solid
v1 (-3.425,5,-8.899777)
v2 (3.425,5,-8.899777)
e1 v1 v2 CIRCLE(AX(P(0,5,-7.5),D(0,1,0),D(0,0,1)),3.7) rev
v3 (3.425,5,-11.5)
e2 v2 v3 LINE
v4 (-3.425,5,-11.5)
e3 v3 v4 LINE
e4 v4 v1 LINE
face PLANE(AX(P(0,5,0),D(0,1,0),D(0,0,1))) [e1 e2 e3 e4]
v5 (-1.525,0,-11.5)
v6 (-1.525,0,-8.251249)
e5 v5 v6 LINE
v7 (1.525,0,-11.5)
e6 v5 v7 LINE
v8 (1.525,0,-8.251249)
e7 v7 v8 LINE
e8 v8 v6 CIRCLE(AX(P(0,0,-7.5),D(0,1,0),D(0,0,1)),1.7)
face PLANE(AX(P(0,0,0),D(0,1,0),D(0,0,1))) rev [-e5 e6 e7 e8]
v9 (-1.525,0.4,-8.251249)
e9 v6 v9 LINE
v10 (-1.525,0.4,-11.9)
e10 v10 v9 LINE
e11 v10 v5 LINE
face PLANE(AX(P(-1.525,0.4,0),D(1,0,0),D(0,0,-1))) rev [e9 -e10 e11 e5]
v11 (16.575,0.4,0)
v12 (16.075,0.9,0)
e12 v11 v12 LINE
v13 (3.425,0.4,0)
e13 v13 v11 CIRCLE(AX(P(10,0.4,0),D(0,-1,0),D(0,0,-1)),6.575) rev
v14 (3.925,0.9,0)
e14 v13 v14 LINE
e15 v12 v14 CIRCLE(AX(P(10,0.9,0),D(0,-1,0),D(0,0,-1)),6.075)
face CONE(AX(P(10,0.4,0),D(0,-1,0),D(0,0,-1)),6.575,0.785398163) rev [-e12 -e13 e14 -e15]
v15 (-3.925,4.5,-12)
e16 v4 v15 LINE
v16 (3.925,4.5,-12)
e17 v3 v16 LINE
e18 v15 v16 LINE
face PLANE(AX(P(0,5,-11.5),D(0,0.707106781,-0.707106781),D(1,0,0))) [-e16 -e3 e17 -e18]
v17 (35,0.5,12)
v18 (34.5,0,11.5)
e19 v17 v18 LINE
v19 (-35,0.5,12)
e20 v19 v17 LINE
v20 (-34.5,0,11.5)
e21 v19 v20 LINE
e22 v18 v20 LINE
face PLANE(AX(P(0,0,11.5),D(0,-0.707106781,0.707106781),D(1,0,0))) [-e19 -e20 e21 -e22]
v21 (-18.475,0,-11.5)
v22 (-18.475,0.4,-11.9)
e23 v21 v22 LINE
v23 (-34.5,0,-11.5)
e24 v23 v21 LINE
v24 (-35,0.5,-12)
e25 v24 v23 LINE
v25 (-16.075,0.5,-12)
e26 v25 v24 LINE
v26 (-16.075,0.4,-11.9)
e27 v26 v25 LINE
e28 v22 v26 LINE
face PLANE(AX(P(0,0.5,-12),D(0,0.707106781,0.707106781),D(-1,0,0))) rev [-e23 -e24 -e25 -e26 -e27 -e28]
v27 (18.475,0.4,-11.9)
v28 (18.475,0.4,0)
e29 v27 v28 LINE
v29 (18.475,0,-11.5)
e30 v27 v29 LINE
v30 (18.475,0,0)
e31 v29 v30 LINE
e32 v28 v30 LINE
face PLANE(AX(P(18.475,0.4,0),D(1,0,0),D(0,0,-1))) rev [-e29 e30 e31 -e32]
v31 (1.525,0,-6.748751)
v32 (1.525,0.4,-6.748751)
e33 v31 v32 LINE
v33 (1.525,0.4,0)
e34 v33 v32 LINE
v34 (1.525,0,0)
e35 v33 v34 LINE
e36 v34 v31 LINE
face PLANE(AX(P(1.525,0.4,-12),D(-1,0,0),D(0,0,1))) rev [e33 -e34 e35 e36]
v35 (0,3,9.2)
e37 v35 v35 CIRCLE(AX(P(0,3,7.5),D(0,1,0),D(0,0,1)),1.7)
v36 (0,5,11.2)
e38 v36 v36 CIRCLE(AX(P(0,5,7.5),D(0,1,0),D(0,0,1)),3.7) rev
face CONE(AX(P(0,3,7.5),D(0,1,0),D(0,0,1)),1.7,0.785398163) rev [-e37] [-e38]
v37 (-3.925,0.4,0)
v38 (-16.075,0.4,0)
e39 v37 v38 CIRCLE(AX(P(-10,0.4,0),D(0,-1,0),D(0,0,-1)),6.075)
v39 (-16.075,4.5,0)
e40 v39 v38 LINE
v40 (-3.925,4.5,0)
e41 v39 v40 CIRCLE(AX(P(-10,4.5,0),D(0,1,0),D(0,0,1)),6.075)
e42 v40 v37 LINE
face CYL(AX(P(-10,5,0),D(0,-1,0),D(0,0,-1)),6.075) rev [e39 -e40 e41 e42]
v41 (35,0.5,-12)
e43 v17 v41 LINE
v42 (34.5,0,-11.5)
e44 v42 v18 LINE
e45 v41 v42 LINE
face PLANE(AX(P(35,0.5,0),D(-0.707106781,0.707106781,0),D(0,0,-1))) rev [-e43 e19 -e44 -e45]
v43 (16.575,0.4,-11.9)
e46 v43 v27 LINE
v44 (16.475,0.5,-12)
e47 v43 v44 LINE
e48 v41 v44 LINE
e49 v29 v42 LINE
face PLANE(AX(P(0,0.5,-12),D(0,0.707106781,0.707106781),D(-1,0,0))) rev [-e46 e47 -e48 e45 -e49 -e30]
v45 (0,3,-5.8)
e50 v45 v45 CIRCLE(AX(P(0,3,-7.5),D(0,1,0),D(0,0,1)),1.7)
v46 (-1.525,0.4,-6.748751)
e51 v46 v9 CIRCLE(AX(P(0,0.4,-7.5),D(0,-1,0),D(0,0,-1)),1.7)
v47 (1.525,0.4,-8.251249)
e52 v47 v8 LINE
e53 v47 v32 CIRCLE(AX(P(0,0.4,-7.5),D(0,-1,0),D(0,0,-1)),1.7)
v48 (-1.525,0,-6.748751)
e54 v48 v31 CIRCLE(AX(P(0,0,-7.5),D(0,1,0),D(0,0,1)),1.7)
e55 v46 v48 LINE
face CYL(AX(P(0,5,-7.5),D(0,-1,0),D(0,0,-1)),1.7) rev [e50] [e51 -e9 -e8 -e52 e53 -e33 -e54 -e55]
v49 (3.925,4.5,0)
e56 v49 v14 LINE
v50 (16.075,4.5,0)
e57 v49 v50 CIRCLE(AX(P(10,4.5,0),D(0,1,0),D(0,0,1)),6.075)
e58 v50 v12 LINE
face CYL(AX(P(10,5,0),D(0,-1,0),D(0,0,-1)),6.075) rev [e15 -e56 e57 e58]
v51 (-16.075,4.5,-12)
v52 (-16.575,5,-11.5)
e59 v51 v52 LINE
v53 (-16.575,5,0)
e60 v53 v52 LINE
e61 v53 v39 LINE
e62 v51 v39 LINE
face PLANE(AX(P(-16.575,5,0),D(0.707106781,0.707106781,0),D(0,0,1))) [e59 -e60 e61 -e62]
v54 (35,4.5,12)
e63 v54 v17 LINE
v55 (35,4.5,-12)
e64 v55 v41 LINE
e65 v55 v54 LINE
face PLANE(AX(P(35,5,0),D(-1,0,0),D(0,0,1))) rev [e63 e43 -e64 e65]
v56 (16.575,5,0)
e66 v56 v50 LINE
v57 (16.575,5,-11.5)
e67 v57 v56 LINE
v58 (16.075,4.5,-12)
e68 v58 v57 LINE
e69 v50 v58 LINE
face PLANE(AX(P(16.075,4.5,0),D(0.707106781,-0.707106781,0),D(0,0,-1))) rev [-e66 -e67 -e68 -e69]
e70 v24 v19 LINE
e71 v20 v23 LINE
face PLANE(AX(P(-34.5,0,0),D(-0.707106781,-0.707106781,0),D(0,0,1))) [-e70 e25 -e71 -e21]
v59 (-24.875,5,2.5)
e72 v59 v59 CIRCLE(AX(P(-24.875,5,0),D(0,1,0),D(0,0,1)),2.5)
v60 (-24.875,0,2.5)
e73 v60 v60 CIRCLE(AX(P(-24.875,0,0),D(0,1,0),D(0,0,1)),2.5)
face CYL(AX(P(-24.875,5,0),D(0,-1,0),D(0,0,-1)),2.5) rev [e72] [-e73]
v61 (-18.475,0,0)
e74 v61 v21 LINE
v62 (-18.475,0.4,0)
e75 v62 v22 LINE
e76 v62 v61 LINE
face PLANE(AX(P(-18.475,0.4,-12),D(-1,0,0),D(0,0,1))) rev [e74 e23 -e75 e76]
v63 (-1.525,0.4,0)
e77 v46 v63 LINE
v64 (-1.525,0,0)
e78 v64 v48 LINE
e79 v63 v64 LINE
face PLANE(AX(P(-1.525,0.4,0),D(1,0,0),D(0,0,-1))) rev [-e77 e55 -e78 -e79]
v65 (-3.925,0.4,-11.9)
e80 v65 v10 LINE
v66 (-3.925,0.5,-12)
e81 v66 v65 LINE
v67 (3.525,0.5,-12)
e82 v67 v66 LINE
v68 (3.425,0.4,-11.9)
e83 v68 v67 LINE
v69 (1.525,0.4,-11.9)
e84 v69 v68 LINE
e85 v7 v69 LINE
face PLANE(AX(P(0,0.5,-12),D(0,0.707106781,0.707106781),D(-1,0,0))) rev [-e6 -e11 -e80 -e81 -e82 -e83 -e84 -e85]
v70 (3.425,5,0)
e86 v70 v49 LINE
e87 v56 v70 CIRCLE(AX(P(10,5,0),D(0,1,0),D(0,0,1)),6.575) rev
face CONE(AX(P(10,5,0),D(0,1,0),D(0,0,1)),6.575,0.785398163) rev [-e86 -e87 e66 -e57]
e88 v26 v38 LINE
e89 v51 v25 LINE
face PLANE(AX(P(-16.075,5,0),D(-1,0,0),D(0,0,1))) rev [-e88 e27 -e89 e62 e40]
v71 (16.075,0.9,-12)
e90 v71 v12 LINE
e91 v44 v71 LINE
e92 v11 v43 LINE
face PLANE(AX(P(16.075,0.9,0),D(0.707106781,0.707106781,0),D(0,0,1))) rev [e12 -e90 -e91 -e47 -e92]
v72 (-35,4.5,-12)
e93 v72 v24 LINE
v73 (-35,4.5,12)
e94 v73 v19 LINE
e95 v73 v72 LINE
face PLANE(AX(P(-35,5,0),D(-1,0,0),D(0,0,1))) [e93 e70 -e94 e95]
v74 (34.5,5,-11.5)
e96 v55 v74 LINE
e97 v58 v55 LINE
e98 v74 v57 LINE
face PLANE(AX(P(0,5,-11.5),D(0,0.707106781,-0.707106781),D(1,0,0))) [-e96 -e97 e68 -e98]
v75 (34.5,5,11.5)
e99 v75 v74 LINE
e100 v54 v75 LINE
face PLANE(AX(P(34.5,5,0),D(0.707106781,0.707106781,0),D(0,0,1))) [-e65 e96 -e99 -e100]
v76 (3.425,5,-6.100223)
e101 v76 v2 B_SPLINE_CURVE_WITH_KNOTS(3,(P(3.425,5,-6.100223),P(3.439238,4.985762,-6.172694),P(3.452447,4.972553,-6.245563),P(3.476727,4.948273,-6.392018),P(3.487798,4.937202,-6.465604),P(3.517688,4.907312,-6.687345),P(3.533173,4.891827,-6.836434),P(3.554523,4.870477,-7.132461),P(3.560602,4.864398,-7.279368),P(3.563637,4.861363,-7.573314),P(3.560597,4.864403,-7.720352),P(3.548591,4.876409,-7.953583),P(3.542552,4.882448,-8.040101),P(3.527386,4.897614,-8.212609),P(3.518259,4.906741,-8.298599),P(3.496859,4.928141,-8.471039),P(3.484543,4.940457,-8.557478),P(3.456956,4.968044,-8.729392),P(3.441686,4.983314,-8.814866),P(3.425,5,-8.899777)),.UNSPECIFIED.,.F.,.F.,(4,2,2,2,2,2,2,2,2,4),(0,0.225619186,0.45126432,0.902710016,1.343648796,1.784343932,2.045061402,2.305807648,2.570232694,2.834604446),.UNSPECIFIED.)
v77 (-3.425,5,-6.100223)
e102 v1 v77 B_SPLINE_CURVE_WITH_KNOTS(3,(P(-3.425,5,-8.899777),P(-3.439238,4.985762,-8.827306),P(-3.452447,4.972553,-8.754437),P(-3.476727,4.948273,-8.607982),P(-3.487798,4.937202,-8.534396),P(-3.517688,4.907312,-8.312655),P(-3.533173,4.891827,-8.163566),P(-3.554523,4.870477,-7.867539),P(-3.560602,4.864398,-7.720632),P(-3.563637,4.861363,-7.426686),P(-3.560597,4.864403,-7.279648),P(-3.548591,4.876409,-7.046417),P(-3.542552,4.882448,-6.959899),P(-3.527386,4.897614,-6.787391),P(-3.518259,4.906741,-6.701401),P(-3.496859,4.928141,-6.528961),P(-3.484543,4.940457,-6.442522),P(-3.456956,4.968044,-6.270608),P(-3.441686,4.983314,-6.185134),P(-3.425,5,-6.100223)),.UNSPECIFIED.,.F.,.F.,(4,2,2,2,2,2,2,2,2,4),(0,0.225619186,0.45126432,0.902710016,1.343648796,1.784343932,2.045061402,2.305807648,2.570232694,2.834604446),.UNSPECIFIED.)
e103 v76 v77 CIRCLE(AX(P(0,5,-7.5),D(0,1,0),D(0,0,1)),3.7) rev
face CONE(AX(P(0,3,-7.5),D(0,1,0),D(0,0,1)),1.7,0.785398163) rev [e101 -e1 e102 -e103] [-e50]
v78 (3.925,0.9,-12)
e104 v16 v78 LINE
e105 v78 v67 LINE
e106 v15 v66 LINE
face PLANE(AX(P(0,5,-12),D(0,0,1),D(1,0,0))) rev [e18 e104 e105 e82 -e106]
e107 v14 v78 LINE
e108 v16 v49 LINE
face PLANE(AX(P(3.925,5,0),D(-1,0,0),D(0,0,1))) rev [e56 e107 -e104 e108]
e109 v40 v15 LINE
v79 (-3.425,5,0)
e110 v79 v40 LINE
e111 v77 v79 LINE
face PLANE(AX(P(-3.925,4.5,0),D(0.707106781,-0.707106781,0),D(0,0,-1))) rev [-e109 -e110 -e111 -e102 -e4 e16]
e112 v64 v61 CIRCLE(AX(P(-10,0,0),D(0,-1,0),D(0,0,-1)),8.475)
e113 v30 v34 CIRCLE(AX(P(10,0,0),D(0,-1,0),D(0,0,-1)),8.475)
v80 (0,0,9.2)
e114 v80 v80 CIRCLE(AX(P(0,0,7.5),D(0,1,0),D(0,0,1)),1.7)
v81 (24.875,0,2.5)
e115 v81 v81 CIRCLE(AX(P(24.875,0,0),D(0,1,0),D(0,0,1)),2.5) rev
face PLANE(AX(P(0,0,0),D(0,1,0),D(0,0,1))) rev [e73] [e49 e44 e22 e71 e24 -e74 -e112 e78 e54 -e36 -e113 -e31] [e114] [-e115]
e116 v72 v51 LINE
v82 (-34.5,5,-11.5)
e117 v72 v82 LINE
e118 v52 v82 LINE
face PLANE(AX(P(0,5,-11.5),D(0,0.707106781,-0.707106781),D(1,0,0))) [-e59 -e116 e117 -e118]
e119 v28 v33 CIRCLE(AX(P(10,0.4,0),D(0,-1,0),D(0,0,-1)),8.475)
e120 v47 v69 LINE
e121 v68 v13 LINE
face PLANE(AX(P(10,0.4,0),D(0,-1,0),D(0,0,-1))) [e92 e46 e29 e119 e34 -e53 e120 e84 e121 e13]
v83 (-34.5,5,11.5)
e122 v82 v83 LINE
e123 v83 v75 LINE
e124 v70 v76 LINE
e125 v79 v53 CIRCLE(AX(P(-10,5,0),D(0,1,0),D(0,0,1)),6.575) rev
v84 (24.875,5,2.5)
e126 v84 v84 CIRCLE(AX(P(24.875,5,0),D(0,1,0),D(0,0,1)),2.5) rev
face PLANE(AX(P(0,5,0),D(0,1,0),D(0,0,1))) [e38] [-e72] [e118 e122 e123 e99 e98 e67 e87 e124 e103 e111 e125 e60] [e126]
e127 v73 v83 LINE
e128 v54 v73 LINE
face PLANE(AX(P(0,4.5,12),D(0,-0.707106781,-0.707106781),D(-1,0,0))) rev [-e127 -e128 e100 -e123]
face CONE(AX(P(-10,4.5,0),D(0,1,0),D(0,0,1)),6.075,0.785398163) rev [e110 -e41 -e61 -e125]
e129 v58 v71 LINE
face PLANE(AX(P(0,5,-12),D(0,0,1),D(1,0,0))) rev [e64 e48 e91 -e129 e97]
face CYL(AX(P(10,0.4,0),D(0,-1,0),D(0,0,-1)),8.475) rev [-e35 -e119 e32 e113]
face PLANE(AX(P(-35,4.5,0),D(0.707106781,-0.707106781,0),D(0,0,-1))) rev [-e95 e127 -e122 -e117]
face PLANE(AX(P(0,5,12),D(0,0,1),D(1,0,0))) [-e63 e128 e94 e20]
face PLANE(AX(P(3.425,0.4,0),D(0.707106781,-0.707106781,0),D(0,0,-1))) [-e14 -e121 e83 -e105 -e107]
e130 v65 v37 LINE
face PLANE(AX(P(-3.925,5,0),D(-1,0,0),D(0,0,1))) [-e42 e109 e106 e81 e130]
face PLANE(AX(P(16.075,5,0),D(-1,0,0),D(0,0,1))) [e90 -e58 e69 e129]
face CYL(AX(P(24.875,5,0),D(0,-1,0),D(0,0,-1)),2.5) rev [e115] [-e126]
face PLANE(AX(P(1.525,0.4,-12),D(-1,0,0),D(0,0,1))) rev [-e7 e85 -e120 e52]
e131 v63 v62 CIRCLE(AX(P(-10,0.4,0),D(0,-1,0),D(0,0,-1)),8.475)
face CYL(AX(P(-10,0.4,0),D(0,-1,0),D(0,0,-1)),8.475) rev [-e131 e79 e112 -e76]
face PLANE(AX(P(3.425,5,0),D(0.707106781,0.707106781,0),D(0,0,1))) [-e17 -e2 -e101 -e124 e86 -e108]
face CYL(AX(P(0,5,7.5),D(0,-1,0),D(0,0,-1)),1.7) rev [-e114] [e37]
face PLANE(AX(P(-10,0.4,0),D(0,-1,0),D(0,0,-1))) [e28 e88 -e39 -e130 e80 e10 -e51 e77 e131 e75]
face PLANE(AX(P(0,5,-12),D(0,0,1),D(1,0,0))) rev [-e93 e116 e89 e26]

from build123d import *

# Parameters (mm, degrees)
SKETCH1_R           = 1.7
SKETCH1_R_2         = 2.5
BOSS_EXTRUDE1_DEPTH = 5
CHAMFER2_SIZE       = 2
CUT_EXTRUDE1_DEPTH  = 0.4
CHAMFER1_SIZE       = 0.5


with BuildPart() as part:
    # Sketch1 → Boss-Extrude1 (new body)
    with BuildSketch(Plane(origin=(0, 0, 0), x_dir=(1, 0, 0), z_dir=(0, 1, 0))):
        with BuildLine():
            Line((-35, -12), (35, -12))
            Line((35, -12), (35, 12))
            Line((35, 12), (16.075, 12))
            Line((16.075, 12), (16.075, 0))
            ThreePointArc((16.075, 0), (10, -6.075), (3.925, 0))
            Line((3.925, 0), (3.925, 12))
            Line((3.925, 12), (-3.925, 12))
            Line((-3.925, 12), (-3.925, 0))
            ThreePointArc((-3.925, 0), (-10, -6.075), (-16.075, 0))
            Line((-16.075, 0), (-16.075, 12))
            Line((-16.075, 12), (-35, 12))
            Line((-35, 12), (-35, -12))
        make_face()
        with Locations(Location((0, -7.5, 0), (0, 0, 270))):
            Circle(SKETCH1_R, mode=Mode.SUBTRACT)
        with Locations(Location((-24.875, 0, 0), (0, 0, 270))):
            Circle(SKETCH1_R_2, mode=Mode.SUBTRACT)
        with Locations(Location((24.875, 0, 0), (0, 0, 270))):
            Circle(SKETCH1_R_2, mode=Mode.SUBTRACT)
        with Locations(Location((0, 7.5, 0), (0, 0, 270))):
            Circle(SKETCH1_R, mode=Mode.SUBTRACT)
    extrude(amount=BOSS_EXTRUDE1_DEPTH)

    # Chamfer2
    chamfer2_edges = [part.edges().sort_by_distance(p)[0] for p in [
        (0, 5, 5.8),
        (0, 5, -9.2),
    ]]
    chamfer(chamfer2_edges, length=CHAMFER2_SIZE)

    # Sketch2 → Cut-Extrude1 (cut)
    with BuildSketch(Plane.XZ):
        with BuildLine():
            Line((-1.525, 0), (-1.525, -12))
            Line((-1.525, -12), (-18.475, -12))
            Line((-18.475, -12), (-18.475, 0))
            ThreePointArc((-18.475, 0), (-10, 8.475), (-1.525, 0))
        make_face()
        with BuildLine():
            Line((18.475, -12), (1.525, -12))
            Line((1.525, -12), (1.525, 0))
            ThreePointArc((1.525, 0), (10, 8.475), (18.475, 0))
            Line((18.475, 0), (18.475, -12))
        make_face()
    extrude(amount=-CUT_EXTRUDE1_DEPTH, mode=Mode.SUBTRACT)

    # Chamfer1
    chamfer1_edges = [part.edges().sort_by_distance(p)[0] for p in [
        (0, 0, 12),
    ]]
    chamfer(chamfer1_edges, length=CHAMFER1_SIZE)
    chamfer1_2_edges = [part.edges().sort_by_distance(p)[0] for p in [
        (0, 5, 12),
    ]]
    chamfer(chamfer1_2_edges, length=CHAMFER1_SIZE)
    chamfer1_3_edges = [part.edges().sort_by_distance(p)[0] for p in [
        (16.075, 0.4, -6),
        (10, 0.4, 6.075),
        (3.925, 0.4, -6),
    ]]
    chamfer(chamfer1_3_edges, length=CHAMFER1_SIZE)
    chamfer1_4_edges = [part.edges().sort_by_distance(p)[0] for p in [
        (35, 0, -0.25),
    ]]
    chamfer(chamfer1_4_edges, length=CHAMFER1_SIZE)
    chamfer1_5_edges = [part.edges().sort_by_distance(p)[0] for p in [
        (-35, 0, -0.25),
    ]]
    chamfer(chamfer1_5_edges, length=CHAMFER1_SIZE)
    chamfer1_6_edges = [part.edges().sort_by_distance(p)[0] for p in [
        (-35, 5, -0.25),
    ]]
    chamfer(chamfer1_6_edges, length=CHAMFER1_SIZE)
    chamfer1_7_edges = [part.edges().sort_by_distance(p)[0] for p in [
        (35, 5, -0.25),
    ]]
    chamfer(chamfer1_7_edges, length=CHAMFER1_SIZE)
    chamfer1_8_edges = [part.edges().sort_by_distance(p)[0] for p in [
        (25.2875, 5, -12),
    ]]
    chamfer(chamfer1_8_edges, length=CHAMFER1_SIZE)
    chamfer1_9_edges = [part.edges().sort_by_distance(p)[0] for p in [
        (-25.2875, 5, -12),
    ]]
    chamfer(chamfer1_9_edges, length=CHAMFER1_SIZE)
    chamfer1_10_edges = [part.edges().sort_by_distance(p)[0] for p in [
        (26.4875, 0, -12),
    ]]
    chamfer(chamfer1_10_edges, length=CHAMFER1_SIZE)
    chamfer1_11_edges = [part.edges().sort_by_distance(p)[0] for p in [
        (-26.4875, 0, -12),
    ]]
    chamfer(chamfer1_11_edges, length=CHAMFER1_SIZE)
    chamfer1_12_edges = [part.edges().sort_by_distance(p)[0] for p in [
        (0, 5, -12),
    ]]
    chamfer(chamfer1_12_edges, length=CHAMFER1_SIZE)
    chamfer1_13_edges = [part.edges().sort_by_distance(p)[0] for p in [
        (0, 0, -12),
    ]]
    chamfer(chamfer1_13_edges, length=CHAMFER1_SIZE)
    # the kernel refuses this chamfer: 0.5 mm, written as the material it takes off along each edge
    with BuildSketch(Plane(origin=(16.075, 5, -12.785841494), x_dir=(0.9996219169112968, 0.02749587661058555, 0), z_dir=(0, 0, 1)), Plane(origin=(3.925, 5, 0), x_dir=(-0.9996219169112968, 0.027495876610585623, 0), z_dir=(0, 0, -1))) as chamfer1_14_piece_1:
        with BuildLine():
            Line((0.514336598, 0), (-0.028273577, -0.513558897))
            Line((-0.028273577, -0.513558897), (-0.038269797, -0.513283938))
            ThreePointArc((-0.038269797, -0.513283938), (-0.017064614, -0.256698915), (-0.009996219, 0.000274959))
            Line((-0.009996219, 0.000274959), (0.000274959, 0.009996219))
            ThreePointArc((0.000274959, 0.009996219), (0.257248832, 0.002927825), (0.514611556, 0.009996219))
            Line((0.514611556, 0.009996219), (0.514336598, 0))
        make_face()
    extrude(amount=12.785841494, mode=Mode.SUBTRACT)
    with BuildSketch(Plane(origin=(10, 5, 0), x_dir=(1, 0, 0), z_dir=(0, 0, -1))) as chamfer1_14_piece_2:
        with BuildLine():
            Line((6.589142136, -0.014142136), (6.060857864, 0.514142136))
            Line((6.060857864, 0.514142136), (6.050857864, 0.514142136))
            ThreePointArc((6.050857864, 0.514142136), (6.065, 0.257071068), (6.065, 0))
            Line((6.065, 0), (6.075, -0.01))
            ThreePointArc((6.075, -0.01), (6.332071068, -0.01), (6.589142136, -0.024142136))
            Line((6.589142136, -0.024142136), (6.589142136, -0.014142136))
        make_face()
    revolve(axis=Axis((10, 5, 0), (0, -1, 0)), revolution_arc=180, mode=Mode.SUBTRACT)
    # the kernel refuses this chamfer: 0.5 mm, written as the material it takes off along each edge
    with BuildSketch(Plane(origin=(-3.925, 5, -12.785841494), x_dir=(-0.02749587661058651, -0.9996219169112968, 0), z_dir=(0, 0, 1))) as chamfer1_15_piece_1:
        with BuildLine():
            Line((0.514336598, 0), (-0.028273577, 0.513558897))
            Line((-0.028273577, 0.513558897), (-0.038269797, 0.513283938))
            ThreePointArc((-0.038269797, 0.513283938), (-0.017064614, 0.256698915), (-0.009996219, -0.000274959))
            Line((-0.009996219, -0.000274959), (0.000274959, -0.009996219))
            ThreePointArc((0.000274959, -0.009996219), (0.257248832, -0.002927825), (0.514611556, -0.009996219))
            Line((0.514611556, -0.009996219), (0.514336598, 0))
        make_face()
    extrude(amount=12.785841494, mode=Mode.SUBTRACT)
    with BuildSketch(Plane(origin=(-10, 5, 0), x_dir=(1, 0, 0), z_dir=(0, 0, -1))) as chamfer1_15_piece_2:
        with BuildLine():
            Line((6.589142136, -0.014142136), (6.060857864, 0.514142136))
            Line((6.060857864, 0.514142136), (6.050857864, 0.514142136))
            ThreePointArc((6.050857864, 0.514142136), (6.065, 0.257071068), (6.065, 0))
            Line((6.065, 0), (6.075, -0.01))
            ThreePointArc((6.075, -0.01), (6.332071068, -0.01), (6.589142136, -0.024142136))
            Line((6.589142136, -0.024142136), (6.589142136, -0.014142136))
        make_face()
    revolve(axis=Axis((-10, 5, 0), (0, -1, 0)), revolution_arc=180, mode=Mode.SUBTRACT)
    with BuildSketch(Plane(origin=(-16.075, 5, 0), x_dir=(-0.9996219169112968, 0.02749587661058555, 0), z_dir=(0, 0, -1))) as chamfer1_15_piece_3:
        with BuildLine():
            Line((0.514336598, 0), (-0.028273577, -0.513558897))
            Line((-0.028273577, -0.513558897), (-0.038269797, -0.513283938))
            ThreePointArc((-0.038269797, -0.513283938), (-0.017064614, -0.256698915), (-0.009996219, 0.000274959))
            Line((-0.009996219, 0.000274959), (0.000274959, 0.009996219))
            ThreePointArc((0.000274959, 0.009996219), (0.257248832, 0.002927825), (0.514611556, 0.009996219))
            Line((0.514611556, 0.009996219), (0.514336598, 0))
        make_face()
    extrude(amount=12.785841494, mode=Mode.SUBTRACT)


solid = part.part
